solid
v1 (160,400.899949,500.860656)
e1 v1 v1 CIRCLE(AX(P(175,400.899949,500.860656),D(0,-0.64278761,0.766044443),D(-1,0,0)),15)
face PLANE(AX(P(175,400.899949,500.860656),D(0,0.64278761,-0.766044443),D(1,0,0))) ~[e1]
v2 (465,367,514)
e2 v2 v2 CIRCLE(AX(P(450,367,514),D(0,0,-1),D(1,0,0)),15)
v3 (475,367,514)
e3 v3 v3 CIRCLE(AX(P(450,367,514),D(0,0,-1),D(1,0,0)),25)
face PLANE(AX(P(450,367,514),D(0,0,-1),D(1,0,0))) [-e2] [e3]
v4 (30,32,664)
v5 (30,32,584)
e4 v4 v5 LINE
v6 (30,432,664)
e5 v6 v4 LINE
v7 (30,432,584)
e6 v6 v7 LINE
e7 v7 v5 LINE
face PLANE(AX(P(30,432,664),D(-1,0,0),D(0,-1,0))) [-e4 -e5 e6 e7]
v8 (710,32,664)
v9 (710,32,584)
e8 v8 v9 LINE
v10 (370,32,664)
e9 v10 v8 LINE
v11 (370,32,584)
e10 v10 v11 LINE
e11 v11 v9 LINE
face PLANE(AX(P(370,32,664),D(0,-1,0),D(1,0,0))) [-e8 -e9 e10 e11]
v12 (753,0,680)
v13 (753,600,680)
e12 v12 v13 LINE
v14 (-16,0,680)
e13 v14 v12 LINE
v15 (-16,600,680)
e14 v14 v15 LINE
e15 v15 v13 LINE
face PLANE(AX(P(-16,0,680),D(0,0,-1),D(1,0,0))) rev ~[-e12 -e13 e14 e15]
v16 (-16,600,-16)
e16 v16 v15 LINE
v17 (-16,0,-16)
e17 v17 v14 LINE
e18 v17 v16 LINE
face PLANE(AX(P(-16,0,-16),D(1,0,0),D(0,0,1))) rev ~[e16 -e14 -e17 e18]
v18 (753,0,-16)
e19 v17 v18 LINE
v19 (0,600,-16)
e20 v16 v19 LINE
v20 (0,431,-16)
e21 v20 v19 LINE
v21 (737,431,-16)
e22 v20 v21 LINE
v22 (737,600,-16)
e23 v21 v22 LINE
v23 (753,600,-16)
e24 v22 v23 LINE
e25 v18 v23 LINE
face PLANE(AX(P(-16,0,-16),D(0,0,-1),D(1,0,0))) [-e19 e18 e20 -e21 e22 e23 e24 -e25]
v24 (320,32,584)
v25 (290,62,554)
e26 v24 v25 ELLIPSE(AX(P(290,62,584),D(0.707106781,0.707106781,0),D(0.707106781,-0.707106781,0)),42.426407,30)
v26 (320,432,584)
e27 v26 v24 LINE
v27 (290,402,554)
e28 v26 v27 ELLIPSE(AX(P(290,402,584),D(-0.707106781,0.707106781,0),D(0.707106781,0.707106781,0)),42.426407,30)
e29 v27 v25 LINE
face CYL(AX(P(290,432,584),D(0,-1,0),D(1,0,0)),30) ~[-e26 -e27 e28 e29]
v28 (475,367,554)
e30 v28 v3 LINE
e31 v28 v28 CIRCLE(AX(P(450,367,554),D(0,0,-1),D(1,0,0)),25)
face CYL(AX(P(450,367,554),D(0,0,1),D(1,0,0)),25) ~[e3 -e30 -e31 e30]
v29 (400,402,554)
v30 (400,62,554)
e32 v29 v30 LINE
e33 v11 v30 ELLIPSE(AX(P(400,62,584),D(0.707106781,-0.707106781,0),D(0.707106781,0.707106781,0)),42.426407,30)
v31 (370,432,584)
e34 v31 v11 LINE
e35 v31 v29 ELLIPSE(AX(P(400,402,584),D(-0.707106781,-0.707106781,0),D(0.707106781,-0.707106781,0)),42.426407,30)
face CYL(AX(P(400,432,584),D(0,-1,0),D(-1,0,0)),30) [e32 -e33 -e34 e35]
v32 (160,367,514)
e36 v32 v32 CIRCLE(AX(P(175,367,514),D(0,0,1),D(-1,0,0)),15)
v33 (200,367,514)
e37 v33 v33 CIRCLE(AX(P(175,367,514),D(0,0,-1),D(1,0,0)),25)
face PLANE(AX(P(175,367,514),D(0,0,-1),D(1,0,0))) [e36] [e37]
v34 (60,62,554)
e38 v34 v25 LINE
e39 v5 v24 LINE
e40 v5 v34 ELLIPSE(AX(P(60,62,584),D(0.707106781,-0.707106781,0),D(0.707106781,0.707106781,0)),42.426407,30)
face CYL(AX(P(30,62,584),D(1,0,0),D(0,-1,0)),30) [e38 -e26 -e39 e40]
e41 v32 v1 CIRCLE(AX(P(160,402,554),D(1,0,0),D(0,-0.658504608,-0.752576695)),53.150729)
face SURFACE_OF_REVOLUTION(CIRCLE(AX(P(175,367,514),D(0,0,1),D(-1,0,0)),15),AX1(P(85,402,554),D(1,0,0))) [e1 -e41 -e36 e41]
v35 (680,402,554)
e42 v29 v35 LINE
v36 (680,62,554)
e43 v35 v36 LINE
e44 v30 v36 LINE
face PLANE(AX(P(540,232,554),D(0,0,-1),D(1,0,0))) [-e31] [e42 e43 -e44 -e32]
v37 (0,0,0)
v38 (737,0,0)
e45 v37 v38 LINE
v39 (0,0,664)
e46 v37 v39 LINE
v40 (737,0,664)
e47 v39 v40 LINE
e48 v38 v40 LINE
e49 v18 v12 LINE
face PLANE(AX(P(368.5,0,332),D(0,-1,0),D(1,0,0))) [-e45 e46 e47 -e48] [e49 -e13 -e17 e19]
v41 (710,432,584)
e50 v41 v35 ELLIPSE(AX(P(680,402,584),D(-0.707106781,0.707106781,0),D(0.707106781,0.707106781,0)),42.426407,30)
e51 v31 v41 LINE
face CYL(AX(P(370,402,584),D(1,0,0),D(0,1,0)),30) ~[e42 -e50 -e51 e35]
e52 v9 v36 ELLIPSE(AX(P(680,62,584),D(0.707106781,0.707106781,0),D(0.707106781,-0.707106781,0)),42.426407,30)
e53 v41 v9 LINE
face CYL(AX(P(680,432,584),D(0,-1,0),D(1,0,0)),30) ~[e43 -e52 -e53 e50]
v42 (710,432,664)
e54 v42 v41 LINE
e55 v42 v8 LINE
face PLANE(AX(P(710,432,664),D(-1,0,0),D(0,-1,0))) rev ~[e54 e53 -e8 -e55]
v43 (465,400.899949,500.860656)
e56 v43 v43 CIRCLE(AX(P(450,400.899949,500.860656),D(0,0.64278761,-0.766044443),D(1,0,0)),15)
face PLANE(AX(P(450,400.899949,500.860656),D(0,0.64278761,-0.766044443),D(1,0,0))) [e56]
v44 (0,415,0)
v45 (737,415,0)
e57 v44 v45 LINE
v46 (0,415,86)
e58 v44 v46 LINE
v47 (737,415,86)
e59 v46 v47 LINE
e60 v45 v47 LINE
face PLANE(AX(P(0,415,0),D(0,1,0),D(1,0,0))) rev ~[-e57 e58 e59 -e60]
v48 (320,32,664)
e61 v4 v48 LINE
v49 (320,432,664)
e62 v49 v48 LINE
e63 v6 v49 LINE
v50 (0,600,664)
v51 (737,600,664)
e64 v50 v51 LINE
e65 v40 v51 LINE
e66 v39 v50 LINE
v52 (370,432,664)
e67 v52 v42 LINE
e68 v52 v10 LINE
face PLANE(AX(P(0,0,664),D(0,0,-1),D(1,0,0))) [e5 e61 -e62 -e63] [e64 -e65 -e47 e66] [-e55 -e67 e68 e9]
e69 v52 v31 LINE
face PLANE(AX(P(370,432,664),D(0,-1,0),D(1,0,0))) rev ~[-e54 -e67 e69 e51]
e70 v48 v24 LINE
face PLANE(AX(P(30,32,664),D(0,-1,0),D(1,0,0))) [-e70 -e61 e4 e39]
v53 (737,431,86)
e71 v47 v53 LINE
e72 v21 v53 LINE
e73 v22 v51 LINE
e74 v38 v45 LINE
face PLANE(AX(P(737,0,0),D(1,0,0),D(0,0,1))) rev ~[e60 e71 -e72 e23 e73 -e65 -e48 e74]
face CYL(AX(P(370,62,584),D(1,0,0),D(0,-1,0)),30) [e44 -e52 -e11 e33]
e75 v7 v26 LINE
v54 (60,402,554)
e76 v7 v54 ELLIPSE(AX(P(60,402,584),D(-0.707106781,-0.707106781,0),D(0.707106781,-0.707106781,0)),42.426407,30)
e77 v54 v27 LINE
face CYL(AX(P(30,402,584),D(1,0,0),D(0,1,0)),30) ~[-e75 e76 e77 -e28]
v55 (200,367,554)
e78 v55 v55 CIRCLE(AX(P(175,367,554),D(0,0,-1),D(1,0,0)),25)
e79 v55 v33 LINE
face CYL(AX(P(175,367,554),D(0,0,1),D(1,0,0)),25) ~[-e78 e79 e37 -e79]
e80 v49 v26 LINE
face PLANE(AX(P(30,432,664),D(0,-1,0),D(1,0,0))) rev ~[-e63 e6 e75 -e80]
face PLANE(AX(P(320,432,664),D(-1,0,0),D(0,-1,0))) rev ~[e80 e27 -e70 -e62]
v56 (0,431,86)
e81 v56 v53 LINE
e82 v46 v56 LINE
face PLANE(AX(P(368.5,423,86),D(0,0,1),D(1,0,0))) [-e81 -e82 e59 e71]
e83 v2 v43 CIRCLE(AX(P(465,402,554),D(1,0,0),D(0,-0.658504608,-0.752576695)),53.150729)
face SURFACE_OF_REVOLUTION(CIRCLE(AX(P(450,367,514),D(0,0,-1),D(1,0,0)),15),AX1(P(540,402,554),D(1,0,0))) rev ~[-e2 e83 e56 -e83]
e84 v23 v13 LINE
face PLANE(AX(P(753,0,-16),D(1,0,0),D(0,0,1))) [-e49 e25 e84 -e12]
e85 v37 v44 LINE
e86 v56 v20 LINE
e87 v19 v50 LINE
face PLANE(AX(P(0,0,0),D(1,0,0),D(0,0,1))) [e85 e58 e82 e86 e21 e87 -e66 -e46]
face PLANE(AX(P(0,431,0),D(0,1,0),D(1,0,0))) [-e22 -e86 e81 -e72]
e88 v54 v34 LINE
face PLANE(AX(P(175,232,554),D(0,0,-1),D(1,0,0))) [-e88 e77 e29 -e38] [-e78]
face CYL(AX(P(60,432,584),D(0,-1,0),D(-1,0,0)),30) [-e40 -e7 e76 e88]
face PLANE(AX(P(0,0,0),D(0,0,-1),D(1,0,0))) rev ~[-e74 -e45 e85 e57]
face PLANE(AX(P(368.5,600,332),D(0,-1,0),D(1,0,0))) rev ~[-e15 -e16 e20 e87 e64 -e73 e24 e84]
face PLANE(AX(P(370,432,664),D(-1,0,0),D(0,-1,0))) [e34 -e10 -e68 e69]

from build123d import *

# Parameters (mm, degrees)
F0_W      = 769
F0_H      = 696
F0_W_2    = 737
F0_H_2    = 664
F1_DEPTH  = 600
F2_W      = 737
F2_H      = 16
F3_DEPTH  = 86
F4_W      = 290
F4_H      = 400
F4_W_2    = 340
F5_DEPTH  = 110
F6_R      = 30
F7_W      = 737
F7_H      = 169
F8_DEPTH  = 16
F9_R      = 25
F10_DEPTH = 40
F11_R     = 25
F12_DEPTH = 40
F13_R     = 15
F14_ANGLE = 40


# Not quite as in the source:
# - a feature of the source that left no trace in its solid (it failed there, or was rolled back) is left out
# - a pattern or mirror of a feature is missing from the dataset's text; its kind, count and spacing are read off the source's solid


with BuildPart() as f1:
    # F0 (on Front) → F1 (new body)
    with BuildSketch(Plane.XZ):
        with Locations((368.5, 332)):
            Rectangle(F0_W, F0_H)
        with Locations((368.5, 332)):
            Rectangle(F0_W_2, F0_H_2, mode=Mode.SUBTRACT)
    extrude(amount=-F1_DEPTH)

    # F2 (on face) → F3 (join)
    with BuildSketch(Plane.XY):
        with Locations((368.5, 423)):
            Rectangle(F2_W, F2_H)
    extrude(amount=F3_DEPTH)

    # F4 (on face) → F5 (join)
    with BuildSketch(Plane(origin=(0, 0, 664), x_dir=(1, 0, 0), z_dir=(0, 0, -1))):
        with Locations((175, -232)):
            Rectangle(F4_W, F4_H)
        with Locations((540, -232)):
            Rectangle(F4_W_2, F4_H)
    extrude(amount=F5_DEPTH)

    # F6
    f6_edges = [f1.edges().sort_by_distance(p)[0] for p in [
        (175, 32, 554),
        (30, 232, 554),
        (175, 432, 554),
        (320, 232, 554),
        (540, 32, 554),
        (370, 232, 554),
        (540, 432, 554),
        (710, 232, 554),
    ]]
    fillet(f6_edges, radius=F6_R)

    # F7 (on face) → F8 (cut, through all)
    with BuildSketch(Plane.XY):
        with Locations((368.5, 515.5)):
            Rectangle(F7_W, F7_H)
    extrude(amount=-F8_DEPTH, mode=Mode.SUBTRACT)

    # F9 (on face) → F10 (join)
    with BuildSketch(Plane(origin=(0, 0, 554), x_dir=(1, 0, 0), z_dir=(0, 0, -1))):
        with Locations((175, -367)):
            Circle(F9_R)
    extrude(amount=F10_DEPTH)

    # F11 (on face) → F12 (join)
    with BuildSketch(Plane(origin=(0, 0, 554), x_dir=(1, 0, 0), z_dir=(0, 0, -1))):
        with Locations((450, -367)):
            Circle(F11_R)
    extrude(amount=F12_DEPTH)

    # F13 (on face) → F14 (revolve)
    with BuildSketch(Plane(origin=(0, 0, 514), x_dir=(1, 0, 0), z_dir=(0, 0, -1))):
        with Locations((450, -367)):
            Circle(F13_R)
    f14 = revolve(axis=Axis((540, 402, 554), (1, 0, 0)), revolution_arc=F14_ANGLE)

    # F14_copies: F14 across plane
    add(f14.mirror(Plane(origin=(312.5, 0, 0), x_dir=(0, 0, -1), z_dir=(-1, 0, 0))))


solid = f1.part
